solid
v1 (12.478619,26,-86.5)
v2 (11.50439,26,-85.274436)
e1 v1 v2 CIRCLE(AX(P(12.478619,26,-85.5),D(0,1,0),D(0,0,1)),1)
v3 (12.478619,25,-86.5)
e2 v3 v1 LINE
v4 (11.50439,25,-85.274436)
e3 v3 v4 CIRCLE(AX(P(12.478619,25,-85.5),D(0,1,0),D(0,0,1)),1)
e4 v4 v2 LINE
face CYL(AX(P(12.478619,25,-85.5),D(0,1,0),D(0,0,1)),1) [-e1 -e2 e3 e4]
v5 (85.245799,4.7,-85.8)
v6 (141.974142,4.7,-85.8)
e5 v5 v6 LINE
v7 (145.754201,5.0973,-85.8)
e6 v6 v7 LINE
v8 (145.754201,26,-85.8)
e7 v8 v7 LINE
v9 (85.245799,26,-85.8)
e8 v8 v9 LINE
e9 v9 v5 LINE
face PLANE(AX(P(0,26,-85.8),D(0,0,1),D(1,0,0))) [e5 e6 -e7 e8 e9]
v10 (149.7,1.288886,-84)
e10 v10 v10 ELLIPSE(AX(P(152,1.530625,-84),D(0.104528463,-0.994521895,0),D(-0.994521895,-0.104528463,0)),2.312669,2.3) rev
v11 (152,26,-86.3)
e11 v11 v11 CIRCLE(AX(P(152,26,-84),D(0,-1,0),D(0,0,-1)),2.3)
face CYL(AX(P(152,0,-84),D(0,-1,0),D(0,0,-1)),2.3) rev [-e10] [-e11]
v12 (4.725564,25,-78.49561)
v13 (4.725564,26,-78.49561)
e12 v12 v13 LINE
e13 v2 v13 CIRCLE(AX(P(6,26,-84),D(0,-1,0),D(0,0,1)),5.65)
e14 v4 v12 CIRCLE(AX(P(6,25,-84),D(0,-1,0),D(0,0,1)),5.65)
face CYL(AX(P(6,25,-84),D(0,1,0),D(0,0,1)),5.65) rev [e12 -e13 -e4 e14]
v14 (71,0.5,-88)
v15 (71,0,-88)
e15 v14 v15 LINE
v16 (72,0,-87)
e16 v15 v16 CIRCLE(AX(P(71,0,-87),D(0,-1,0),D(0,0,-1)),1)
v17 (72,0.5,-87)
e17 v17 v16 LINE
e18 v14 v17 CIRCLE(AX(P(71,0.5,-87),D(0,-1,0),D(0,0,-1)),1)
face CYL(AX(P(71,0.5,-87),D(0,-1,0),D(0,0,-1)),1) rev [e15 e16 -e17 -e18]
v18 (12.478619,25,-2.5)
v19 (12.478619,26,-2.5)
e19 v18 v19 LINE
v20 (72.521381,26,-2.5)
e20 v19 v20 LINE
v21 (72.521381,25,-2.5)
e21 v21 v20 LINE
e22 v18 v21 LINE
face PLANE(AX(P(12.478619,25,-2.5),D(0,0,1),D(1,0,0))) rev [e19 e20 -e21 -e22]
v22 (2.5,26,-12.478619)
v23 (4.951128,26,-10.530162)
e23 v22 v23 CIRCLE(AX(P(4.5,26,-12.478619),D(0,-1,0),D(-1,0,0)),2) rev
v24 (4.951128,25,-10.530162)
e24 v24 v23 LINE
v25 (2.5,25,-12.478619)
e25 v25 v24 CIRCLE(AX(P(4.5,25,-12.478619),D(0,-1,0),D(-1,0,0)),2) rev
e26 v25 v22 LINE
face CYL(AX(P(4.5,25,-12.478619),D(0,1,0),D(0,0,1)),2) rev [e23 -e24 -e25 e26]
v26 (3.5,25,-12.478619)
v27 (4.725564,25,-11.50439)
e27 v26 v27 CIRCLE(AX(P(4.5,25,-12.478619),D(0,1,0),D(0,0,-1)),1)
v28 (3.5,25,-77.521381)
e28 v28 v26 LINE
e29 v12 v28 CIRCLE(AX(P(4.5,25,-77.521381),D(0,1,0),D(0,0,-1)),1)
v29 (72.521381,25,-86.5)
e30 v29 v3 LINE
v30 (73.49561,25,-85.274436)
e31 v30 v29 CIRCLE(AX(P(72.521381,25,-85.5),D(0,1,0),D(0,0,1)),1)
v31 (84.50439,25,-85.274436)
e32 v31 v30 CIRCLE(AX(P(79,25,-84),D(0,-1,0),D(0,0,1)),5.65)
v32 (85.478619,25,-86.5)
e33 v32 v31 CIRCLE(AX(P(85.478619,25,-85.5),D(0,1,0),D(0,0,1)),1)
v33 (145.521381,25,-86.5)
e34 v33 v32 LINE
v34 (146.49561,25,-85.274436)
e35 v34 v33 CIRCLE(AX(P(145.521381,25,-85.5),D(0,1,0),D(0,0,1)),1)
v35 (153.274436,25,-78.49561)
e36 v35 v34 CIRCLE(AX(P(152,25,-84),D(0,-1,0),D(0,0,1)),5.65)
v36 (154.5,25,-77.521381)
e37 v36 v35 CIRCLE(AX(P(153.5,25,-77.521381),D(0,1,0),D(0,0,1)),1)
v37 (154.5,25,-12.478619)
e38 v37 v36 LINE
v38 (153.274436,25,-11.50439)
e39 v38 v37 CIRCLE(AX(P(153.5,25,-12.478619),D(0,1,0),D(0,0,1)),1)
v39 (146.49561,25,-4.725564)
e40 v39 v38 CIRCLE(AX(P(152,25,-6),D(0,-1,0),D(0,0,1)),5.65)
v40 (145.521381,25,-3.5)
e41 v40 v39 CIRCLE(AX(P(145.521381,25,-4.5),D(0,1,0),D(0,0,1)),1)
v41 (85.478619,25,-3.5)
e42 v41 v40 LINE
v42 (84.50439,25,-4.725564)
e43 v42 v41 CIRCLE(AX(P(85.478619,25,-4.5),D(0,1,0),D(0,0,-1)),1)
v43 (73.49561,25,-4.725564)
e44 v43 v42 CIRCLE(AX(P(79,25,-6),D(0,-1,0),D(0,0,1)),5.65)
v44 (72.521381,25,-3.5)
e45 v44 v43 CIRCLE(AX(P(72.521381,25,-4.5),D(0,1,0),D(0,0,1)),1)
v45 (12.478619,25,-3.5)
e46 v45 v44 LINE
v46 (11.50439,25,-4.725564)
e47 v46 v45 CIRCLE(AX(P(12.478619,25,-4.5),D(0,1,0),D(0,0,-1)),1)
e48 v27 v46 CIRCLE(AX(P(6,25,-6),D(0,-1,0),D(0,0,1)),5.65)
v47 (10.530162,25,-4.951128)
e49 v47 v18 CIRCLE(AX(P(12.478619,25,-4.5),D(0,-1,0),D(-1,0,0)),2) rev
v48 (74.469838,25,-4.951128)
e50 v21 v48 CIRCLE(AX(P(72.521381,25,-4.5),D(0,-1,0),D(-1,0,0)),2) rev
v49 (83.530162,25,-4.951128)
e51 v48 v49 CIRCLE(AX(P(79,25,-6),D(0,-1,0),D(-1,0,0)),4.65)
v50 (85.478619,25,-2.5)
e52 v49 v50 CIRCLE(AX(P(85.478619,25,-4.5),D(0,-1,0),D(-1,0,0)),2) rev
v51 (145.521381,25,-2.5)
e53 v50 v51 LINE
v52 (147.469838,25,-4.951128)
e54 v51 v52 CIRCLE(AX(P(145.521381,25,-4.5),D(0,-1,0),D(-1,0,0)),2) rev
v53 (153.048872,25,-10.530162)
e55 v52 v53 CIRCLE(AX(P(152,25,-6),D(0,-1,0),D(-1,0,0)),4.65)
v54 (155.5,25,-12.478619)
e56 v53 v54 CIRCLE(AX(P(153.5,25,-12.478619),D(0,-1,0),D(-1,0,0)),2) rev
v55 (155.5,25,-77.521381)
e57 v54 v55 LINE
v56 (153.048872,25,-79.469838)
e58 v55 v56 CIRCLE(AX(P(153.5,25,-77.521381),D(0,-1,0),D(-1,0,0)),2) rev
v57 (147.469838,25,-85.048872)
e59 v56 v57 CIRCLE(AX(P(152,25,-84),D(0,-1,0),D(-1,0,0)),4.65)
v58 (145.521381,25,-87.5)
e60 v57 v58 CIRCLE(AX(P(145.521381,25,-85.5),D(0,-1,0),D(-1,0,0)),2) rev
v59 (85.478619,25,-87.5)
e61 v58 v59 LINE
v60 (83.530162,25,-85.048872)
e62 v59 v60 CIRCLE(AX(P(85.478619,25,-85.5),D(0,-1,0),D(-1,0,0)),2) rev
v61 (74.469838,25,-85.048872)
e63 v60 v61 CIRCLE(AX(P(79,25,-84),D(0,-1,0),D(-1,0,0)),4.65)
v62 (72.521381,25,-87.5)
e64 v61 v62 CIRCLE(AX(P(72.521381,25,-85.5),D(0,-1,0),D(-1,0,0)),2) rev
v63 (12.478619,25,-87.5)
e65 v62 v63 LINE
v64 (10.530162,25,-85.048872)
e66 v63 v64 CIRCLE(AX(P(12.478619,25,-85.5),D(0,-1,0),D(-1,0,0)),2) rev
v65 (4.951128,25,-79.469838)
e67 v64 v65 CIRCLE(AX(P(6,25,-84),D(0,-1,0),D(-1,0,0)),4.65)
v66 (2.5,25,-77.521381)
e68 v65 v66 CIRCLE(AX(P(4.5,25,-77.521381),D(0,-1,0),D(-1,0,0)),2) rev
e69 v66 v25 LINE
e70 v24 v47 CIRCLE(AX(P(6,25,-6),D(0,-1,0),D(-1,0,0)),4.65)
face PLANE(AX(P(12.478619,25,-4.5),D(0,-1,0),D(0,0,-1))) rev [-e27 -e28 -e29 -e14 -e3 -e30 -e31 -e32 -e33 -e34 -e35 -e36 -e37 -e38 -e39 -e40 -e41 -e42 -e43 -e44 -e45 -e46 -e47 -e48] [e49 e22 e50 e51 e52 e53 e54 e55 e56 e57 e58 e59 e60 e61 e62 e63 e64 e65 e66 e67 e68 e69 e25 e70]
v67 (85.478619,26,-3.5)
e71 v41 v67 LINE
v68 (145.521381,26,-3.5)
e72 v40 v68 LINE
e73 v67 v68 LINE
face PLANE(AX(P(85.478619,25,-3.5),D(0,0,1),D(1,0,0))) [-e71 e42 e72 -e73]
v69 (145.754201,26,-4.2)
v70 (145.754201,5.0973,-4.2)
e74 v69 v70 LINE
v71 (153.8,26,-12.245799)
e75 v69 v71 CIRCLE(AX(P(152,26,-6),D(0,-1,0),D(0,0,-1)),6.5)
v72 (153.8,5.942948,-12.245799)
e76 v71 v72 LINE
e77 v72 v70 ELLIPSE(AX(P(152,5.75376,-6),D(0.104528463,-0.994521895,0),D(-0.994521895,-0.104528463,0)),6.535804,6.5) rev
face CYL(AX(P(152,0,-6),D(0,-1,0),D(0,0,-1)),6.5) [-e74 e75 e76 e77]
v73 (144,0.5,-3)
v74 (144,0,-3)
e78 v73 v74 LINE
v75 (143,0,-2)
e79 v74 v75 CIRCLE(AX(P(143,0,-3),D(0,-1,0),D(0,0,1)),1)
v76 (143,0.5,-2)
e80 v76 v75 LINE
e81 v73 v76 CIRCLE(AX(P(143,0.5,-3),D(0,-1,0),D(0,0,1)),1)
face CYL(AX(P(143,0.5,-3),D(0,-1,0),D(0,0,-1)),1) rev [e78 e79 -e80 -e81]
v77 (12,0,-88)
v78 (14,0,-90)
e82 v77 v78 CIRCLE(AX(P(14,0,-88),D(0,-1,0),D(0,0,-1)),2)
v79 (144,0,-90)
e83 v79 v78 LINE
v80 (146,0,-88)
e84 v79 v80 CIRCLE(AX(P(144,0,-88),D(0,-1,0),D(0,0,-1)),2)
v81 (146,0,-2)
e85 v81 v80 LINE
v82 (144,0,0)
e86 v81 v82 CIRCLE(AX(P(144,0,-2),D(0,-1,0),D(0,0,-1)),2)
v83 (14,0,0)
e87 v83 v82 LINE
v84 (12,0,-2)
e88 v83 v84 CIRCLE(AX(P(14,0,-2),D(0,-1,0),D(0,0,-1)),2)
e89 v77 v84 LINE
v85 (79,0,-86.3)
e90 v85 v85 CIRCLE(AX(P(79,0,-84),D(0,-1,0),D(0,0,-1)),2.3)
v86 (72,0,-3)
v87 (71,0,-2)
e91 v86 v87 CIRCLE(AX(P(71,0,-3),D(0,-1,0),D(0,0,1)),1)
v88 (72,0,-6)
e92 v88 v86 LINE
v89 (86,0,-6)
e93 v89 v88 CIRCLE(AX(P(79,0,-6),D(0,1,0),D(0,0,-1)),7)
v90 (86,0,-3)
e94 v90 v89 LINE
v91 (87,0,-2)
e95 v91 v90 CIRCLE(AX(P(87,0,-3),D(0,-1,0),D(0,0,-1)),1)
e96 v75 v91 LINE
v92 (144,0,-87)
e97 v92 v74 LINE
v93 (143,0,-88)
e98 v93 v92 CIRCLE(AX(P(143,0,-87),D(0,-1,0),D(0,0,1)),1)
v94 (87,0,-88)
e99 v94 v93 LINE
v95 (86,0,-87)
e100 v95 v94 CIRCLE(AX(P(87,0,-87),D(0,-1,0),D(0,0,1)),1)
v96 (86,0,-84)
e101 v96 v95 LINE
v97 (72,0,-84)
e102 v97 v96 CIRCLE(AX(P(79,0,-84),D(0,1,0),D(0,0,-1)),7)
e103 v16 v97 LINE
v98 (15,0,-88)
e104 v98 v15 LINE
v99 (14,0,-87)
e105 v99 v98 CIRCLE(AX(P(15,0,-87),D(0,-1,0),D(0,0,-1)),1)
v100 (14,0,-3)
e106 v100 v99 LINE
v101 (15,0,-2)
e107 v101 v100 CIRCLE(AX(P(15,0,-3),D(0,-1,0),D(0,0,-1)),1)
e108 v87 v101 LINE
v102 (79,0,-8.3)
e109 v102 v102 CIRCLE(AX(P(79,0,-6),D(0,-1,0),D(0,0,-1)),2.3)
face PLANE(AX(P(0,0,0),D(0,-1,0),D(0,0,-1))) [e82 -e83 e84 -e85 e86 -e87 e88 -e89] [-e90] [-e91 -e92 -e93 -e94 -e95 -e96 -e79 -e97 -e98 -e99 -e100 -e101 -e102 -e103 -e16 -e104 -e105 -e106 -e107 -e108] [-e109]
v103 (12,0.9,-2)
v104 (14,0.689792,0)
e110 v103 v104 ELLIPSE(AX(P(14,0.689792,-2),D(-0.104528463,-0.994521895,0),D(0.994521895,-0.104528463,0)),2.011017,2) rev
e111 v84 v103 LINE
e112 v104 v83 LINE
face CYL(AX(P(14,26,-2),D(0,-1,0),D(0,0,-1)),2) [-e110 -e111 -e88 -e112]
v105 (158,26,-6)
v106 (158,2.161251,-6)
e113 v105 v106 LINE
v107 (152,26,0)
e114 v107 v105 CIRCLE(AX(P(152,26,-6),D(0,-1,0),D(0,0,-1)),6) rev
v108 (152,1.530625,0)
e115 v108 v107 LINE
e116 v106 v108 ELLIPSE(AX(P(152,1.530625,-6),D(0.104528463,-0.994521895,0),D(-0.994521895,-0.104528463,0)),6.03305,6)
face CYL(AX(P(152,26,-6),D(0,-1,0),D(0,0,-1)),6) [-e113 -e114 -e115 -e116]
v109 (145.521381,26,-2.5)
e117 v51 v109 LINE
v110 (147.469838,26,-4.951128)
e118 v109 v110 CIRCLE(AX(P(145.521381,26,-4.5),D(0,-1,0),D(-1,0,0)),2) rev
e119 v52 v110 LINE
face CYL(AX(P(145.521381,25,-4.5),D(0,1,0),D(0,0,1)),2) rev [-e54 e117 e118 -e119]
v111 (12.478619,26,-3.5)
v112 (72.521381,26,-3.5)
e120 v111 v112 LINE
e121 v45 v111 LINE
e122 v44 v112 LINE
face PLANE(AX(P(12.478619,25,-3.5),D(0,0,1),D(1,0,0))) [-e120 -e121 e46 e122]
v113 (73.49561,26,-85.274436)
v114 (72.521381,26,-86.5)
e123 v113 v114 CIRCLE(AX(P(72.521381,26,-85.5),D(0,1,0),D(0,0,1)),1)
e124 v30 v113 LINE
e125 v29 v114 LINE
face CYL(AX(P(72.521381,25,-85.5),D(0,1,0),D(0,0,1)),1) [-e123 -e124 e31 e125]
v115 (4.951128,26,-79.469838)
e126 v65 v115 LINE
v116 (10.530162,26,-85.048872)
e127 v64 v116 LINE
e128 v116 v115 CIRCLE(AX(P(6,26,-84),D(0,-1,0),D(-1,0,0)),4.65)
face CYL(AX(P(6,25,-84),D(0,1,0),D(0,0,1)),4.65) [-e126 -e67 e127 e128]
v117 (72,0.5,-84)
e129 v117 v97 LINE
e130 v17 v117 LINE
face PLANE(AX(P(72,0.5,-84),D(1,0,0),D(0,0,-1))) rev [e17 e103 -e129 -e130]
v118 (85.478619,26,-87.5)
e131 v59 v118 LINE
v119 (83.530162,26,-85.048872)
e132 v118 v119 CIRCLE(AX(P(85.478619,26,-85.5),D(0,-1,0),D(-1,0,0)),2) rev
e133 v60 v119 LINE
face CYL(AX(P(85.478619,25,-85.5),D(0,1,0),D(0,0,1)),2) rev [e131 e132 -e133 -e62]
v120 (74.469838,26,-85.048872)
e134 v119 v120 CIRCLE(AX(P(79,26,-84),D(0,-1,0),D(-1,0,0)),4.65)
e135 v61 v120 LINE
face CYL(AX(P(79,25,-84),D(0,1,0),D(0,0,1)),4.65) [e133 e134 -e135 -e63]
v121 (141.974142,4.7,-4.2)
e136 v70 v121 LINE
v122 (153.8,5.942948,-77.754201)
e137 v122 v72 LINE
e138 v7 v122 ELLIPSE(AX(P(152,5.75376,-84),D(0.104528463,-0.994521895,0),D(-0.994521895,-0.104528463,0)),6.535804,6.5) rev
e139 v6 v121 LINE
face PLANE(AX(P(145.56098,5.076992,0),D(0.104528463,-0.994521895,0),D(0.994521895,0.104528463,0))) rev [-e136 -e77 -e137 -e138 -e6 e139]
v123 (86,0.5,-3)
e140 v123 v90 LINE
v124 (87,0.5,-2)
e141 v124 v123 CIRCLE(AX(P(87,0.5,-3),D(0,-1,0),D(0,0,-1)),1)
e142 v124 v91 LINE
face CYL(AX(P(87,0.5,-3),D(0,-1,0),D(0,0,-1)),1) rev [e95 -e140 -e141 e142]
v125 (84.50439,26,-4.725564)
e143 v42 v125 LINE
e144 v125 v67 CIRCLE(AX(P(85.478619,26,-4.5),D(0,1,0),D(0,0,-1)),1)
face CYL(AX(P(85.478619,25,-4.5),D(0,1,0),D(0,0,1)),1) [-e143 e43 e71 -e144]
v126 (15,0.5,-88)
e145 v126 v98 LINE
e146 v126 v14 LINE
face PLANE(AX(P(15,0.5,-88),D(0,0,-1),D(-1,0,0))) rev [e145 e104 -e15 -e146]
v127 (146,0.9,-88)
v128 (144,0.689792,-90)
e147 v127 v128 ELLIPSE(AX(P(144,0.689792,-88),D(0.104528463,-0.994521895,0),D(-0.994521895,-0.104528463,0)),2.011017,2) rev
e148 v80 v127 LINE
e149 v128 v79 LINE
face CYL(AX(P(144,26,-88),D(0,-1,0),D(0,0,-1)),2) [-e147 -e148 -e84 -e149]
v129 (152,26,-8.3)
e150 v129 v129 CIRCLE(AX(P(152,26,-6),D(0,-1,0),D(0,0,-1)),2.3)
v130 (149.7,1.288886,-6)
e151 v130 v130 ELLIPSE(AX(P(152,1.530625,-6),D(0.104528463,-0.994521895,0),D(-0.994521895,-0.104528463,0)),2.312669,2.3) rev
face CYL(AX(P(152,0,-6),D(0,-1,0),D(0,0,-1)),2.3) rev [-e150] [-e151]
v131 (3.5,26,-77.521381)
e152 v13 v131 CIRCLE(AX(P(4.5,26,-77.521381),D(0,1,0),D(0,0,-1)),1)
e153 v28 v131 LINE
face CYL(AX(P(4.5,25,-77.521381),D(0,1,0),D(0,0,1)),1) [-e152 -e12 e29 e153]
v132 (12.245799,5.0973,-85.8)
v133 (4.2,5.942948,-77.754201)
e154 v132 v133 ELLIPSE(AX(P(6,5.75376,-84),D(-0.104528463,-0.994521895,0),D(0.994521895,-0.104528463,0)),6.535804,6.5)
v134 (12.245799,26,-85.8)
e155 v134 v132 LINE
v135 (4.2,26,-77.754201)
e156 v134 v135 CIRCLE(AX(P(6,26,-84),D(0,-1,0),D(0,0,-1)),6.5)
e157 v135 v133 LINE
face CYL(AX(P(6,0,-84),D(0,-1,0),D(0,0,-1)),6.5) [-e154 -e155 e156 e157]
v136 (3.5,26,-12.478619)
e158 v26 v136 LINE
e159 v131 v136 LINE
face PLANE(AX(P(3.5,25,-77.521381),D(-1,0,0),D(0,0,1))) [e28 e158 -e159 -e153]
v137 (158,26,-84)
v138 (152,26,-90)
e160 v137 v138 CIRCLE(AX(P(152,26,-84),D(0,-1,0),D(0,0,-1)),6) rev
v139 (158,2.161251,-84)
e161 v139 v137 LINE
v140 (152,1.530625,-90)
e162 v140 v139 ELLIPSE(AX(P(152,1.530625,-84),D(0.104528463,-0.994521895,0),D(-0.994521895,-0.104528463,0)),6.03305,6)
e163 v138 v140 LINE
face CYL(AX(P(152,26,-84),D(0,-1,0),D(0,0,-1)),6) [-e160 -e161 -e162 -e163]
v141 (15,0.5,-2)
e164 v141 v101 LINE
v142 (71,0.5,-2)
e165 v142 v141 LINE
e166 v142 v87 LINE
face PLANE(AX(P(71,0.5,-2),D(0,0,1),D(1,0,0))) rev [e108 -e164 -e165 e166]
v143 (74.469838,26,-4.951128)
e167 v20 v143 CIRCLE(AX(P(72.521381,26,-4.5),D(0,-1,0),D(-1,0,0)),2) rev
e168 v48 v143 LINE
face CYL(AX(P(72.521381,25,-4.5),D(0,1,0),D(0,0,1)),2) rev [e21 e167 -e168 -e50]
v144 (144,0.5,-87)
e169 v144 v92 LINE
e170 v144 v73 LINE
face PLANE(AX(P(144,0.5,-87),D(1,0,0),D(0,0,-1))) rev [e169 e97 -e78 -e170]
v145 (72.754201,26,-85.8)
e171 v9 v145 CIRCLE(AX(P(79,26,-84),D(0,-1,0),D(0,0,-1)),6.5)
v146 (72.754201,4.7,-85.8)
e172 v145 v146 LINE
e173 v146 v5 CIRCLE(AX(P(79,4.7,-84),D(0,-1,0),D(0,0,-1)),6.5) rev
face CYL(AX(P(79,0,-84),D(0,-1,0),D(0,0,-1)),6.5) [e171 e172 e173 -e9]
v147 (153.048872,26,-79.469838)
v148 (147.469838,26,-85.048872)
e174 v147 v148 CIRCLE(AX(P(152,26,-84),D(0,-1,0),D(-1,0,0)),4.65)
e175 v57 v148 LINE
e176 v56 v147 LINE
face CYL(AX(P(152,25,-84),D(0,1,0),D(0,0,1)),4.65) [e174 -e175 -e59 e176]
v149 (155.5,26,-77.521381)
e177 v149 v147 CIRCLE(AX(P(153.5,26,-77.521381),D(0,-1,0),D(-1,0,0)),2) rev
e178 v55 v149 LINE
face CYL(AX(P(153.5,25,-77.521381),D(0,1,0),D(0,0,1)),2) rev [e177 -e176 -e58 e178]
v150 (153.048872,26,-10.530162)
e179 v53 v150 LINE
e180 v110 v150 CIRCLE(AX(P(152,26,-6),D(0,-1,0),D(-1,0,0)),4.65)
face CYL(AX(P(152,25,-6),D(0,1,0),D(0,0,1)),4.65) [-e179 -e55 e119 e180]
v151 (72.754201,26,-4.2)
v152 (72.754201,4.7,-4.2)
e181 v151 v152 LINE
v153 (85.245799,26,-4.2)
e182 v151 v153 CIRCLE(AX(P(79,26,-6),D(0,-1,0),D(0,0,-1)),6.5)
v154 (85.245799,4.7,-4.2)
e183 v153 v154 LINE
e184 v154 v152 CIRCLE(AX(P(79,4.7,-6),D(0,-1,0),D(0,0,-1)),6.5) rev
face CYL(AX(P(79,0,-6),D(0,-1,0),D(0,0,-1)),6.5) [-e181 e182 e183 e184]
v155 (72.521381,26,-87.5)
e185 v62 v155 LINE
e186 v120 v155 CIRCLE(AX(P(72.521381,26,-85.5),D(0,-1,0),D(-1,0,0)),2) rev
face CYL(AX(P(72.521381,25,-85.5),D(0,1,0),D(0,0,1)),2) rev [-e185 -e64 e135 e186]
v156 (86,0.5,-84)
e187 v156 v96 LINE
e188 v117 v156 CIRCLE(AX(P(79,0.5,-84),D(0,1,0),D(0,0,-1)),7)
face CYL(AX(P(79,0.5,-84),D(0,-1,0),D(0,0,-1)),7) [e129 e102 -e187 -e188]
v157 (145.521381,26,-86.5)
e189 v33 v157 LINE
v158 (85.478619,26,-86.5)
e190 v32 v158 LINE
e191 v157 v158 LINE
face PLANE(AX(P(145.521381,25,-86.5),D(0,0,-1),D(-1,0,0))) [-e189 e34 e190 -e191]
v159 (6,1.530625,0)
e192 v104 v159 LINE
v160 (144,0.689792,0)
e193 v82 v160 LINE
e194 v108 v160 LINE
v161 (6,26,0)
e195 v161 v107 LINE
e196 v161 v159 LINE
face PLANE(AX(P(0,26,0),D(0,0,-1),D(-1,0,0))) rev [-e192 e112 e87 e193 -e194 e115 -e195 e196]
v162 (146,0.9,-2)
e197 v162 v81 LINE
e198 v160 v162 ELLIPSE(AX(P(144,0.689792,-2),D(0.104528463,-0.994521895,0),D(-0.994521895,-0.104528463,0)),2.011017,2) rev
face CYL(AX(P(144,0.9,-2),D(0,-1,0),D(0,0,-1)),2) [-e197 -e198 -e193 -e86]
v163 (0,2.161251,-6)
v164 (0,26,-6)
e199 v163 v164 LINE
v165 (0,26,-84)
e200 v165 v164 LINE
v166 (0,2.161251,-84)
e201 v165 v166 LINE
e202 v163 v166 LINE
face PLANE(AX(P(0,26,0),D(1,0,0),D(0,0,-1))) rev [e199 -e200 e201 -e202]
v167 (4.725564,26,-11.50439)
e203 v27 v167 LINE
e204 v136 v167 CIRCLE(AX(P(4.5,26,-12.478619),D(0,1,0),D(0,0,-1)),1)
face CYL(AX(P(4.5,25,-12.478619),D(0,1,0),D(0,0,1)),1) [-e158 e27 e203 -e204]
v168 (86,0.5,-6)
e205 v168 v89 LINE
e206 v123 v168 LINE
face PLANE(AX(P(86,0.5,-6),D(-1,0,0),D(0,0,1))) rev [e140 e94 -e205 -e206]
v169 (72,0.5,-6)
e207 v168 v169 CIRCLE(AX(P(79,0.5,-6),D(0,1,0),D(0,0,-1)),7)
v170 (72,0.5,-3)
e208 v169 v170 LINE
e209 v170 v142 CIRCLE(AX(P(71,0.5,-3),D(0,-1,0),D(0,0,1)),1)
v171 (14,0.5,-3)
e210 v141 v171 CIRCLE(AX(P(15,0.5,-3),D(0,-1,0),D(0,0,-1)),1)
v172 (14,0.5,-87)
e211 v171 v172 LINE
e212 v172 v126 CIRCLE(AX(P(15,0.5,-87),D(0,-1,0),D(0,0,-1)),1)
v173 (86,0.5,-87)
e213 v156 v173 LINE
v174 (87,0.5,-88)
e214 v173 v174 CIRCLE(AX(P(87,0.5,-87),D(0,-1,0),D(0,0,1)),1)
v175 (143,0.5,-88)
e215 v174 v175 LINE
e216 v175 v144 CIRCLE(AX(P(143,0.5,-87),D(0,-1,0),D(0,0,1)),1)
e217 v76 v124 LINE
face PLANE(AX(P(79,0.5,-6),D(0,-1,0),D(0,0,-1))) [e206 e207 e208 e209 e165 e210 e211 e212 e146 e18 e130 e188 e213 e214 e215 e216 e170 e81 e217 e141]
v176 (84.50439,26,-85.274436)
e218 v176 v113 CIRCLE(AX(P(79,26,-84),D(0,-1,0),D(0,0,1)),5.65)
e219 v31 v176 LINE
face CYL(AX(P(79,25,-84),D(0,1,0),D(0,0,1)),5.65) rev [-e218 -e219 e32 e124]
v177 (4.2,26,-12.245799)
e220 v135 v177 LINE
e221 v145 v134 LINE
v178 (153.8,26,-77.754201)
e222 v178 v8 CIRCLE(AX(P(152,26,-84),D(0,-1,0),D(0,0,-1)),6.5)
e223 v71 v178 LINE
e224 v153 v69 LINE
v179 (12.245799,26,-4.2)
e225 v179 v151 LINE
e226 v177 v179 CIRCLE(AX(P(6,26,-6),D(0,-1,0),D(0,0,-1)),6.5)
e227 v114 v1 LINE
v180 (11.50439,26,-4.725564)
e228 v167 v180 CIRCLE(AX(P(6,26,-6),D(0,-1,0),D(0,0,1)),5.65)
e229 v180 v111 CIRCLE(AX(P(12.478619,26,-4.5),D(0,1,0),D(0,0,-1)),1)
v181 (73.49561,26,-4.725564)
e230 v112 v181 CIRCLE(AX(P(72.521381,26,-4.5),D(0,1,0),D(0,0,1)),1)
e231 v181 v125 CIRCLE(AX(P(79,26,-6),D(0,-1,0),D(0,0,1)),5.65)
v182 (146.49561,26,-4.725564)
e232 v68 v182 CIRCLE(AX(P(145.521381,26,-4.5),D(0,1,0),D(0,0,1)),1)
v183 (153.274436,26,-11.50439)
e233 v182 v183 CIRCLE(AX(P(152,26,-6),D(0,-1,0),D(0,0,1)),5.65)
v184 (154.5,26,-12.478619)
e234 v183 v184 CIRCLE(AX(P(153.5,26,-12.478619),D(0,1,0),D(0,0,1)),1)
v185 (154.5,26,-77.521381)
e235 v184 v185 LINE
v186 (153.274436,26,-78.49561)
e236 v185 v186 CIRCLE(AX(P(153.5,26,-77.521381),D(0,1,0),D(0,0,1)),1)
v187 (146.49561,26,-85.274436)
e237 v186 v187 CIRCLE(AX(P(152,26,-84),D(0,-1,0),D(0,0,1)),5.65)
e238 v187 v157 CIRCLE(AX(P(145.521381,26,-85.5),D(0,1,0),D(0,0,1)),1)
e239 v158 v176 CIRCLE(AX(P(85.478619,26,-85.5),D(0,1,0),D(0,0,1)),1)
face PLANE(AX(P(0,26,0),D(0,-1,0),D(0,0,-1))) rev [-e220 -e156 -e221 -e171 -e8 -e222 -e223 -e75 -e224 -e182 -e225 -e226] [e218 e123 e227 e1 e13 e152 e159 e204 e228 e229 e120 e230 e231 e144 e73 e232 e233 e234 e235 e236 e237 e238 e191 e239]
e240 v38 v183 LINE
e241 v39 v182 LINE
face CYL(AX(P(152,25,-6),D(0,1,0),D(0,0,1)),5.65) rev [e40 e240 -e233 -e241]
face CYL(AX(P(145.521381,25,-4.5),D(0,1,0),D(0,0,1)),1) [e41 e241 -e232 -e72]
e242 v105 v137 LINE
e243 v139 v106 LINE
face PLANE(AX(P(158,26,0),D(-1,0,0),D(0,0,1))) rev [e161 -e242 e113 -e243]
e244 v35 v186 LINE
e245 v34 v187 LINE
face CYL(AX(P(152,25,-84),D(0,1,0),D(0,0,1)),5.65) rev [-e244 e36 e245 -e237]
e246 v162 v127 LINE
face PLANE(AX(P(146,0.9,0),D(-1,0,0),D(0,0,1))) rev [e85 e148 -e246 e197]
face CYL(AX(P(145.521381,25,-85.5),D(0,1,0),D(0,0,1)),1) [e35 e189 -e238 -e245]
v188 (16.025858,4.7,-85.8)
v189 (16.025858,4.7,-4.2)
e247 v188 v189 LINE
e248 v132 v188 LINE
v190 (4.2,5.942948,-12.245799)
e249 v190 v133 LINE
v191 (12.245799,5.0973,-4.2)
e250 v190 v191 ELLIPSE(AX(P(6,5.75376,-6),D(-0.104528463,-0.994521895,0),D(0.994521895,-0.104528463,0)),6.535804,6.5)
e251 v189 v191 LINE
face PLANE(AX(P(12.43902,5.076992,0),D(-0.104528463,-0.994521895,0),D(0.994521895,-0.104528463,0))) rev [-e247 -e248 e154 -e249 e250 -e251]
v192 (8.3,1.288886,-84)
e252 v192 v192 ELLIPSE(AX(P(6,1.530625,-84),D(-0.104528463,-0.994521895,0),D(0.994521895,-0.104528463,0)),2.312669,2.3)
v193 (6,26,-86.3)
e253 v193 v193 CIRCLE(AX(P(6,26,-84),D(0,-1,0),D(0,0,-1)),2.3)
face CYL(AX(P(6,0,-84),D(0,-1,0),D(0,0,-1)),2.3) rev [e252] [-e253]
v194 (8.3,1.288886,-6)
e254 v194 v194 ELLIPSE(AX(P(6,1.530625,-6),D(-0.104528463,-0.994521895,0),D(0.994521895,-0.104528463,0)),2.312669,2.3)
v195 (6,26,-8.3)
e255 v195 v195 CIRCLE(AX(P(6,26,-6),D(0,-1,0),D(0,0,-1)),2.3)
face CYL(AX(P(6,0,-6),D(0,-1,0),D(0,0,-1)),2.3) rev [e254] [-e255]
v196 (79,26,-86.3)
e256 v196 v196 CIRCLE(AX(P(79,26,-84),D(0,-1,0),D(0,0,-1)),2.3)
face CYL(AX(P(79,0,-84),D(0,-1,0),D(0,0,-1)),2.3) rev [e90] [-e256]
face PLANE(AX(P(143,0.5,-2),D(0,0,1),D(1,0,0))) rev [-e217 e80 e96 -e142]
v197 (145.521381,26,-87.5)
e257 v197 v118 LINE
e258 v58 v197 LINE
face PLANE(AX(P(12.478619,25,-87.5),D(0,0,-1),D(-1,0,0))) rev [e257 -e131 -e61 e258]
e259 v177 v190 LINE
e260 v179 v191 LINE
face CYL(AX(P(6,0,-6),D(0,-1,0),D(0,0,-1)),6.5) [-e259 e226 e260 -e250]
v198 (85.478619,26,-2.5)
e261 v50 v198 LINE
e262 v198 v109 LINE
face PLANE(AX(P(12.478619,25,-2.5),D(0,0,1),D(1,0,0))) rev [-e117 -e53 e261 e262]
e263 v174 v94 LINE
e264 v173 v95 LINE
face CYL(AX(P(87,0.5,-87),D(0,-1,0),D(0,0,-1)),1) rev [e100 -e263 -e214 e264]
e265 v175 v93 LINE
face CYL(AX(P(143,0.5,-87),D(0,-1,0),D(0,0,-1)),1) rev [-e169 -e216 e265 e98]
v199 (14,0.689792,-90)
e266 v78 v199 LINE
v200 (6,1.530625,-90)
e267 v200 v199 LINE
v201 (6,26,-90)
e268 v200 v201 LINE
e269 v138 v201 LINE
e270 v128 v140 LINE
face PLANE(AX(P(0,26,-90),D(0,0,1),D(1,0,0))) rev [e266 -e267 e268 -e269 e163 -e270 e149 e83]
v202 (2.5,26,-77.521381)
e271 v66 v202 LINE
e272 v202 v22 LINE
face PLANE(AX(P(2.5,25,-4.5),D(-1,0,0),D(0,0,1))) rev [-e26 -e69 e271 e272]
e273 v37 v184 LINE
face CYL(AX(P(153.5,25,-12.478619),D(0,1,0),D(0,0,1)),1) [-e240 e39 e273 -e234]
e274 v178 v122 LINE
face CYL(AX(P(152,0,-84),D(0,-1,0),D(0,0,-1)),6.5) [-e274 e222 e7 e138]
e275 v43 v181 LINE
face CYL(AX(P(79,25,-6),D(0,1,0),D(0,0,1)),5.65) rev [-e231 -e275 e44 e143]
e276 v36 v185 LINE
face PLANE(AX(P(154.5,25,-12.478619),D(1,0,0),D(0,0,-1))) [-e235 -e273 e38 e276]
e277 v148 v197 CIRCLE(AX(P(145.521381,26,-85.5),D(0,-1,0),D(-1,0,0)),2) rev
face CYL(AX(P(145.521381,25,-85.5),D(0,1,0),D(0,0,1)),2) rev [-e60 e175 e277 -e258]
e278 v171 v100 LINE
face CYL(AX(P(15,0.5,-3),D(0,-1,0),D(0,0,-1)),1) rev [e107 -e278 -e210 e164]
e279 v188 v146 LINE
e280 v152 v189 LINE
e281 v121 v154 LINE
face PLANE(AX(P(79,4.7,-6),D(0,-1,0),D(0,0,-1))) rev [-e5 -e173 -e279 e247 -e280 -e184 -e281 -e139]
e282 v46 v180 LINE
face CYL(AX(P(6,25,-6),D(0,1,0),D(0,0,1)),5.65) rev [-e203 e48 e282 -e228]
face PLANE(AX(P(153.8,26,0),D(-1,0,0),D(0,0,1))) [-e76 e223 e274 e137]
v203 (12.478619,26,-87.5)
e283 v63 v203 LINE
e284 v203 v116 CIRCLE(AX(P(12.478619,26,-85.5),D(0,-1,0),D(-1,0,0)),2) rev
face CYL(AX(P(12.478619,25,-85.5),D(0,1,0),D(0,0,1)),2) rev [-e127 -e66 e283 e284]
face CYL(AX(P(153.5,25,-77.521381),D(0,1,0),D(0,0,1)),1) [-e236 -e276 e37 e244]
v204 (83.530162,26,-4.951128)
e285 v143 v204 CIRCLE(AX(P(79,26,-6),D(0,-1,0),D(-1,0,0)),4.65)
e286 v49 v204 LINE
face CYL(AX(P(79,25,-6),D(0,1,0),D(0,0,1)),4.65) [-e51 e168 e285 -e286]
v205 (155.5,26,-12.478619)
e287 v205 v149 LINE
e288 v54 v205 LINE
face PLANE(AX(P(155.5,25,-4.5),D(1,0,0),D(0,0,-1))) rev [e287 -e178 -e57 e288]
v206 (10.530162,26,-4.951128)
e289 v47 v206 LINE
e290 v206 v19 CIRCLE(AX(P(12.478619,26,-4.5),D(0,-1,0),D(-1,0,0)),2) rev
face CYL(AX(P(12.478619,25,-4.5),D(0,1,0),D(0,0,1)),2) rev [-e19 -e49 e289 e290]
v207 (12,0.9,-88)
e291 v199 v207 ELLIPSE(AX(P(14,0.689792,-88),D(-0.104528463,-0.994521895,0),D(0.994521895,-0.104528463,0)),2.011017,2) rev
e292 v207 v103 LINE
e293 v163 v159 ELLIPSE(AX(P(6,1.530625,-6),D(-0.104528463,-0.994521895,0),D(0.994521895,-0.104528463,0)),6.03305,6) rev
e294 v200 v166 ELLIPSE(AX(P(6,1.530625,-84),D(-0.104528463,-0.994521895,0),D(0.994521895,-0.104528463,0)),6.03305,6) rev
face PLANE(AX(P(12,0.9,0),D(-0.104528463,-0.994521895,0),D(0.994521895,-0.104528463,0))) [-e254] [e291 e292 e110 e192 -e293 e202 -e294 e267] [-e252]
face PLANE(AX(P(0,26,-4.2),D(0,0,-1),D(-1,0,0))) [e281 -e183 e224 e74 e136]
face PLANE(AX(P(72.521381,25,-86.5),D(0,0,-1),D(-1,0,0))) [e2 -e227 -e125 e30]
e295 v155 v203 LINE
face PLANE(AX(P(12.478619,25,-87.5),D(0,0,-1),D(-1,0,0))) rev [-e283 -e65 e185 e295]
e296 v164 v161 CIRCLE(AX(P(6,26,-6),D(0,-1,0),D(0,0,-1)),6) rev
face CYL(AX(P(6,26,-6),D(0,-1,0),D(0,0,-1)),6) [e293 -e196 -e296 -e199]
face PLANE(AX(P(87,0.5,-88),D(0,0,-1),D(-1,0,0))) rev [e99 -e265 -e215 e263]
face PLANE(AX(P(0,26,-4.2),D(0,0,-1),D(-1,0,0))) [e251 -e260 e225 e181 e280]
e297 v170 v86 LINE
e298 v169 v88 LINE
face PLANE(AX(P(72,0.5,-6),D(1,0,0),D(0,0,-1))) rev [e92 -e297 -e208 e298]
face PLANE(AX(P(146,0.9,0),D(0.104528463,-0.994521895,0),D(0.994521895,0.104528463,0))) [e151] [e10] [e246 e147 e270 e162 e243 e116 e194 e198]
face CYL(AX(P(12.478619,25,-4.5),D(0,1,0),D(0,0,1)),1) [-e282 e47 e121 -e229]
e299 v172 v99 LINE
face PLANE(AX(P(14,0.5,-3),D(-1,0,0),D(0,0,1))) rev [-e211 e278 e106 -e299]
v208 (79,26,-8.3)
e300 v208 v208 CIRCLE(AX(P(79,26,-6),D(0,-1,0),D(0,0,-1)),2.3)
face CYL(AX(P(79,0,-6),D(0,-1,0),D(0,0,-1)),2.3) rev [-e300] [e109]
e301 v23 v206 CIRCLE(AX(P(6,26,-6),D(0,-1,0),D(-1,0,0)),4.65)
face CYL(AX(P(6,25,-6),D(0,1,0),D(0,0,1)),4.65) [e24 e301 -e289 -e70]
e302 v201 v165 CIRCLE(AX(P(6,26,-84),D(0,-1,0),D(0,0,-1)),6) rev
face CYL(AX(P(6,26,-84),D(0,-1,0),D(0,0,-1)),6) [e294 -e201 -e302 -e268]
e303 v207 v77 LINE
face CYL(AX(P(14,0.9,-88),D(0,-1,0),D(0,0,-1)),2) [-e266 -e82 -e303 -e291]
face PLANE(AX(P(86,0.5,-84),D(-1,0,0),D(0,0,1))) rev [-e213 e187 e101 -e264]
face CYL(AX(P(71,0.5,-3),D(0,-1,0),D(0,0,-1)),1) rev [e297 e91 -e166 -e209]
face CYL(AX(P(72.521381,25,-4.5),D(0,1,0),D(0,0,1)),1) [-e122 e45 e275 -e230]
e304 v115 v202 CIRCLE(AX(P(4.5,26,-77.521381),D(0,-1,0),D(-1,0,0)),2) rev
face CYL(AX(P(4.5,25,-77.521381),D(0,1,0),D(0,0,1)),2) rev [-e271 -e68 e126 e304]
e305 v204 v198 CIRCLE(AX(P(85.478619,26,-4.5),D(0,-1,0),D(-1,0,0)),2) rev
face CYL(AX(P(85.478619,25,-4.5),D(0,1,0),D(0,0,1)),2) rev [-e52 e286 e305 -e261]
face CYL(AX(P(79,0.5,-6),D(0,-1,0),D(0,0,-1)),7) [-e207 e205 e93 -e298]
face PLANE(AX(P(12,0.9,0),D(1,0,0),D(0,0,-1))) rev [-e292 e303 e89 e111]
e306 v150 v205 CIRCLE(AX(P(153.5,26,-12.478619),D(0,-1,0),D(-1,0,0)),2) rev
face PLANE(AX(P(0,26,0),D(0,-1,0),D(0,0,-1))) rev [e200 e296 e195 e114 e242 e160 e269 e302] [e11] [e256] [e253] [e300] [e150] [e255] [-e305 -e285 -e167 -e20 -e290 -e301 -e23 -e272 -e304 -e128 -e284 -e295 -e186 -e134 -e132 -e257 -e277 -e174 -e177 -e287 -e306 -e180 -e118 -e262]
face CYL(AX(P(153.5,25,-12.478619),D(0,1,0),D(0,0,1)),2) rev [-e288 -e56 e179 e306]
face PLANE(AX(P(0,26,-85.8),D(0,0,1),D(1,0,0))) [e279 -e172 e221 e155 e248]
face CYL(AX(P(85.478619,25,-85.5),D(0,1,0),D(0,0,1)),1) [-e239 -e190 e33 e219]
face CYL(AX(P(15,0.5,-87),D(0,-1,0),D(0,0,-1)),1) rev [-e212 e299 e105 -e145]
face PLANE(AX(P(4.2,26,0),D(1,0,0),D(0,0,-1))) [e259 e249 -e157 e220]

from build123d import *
from build123d.topology import SkipClean

# Parameters (mm, degrees)
SKETCH1_W               = 158
SKETCH1_H               = 90
BOSS_EXTRUDE1_DEPTH     = 26
FILLET1_R               = 6
SKETCH3_W               = 12
SKETCH3_H               = 90
CUT_EXTRUDE1_DEPTH      = 0.9
FILLET2_R               = 2
DRAFT1_ANGLE            = 6
DRAFT2_ANGLE            = 6
HOLE1_D                 = 4.6
HOLE1_DEPTH             = 26
HOLE1_TIP               = 1.381979424
CUT_EXTRUDE2_DEPTH      = 0.5
SHELL1_START            = -77.5
SHELL1_DEPTH            = 65
SHELL1_START_2          = -85.8
SHELL1_2_DEPTH          = 81.6
SHELL1_START_3          = 4.7
SHELL1_3_DEPTH          = 21.3
CUT_EXTRUDE_THIN1_DEPTH = 1


with BuildPart() as part:
    # Sketch1 → Boss-Extrude1 (new body)
    with BuildSketch(Plane(origin=(0, 0, 0), x_dir=(1, 0, 0), z_dir=(0, 1, 0))):
        with Locations((79, 45)):
            Rectangle(SKETCH1_W, SKETCH1_H)
    extrude(amount=BOSS_EXTRUDE1_DEPTH)

    # Fillet1
    fillet1_edges = [part.edges().sort_by_distance(p)[0] for p in [
        (0, 13, -90),
        (158, 13, -90),
        (158, 13, 0),
        (0, 13, 0),
    ]]
    fillet(fillet1_edges, radius=FILLET1_R)

    # Sketch3 → Cut-Extrude1 (cut)
    with BuildSketch(Plane.XZ):
        with Locations((6, -45)):
            Rectangle(SKETCH3_W, SKETCH3_H)
        with Locations((152, -45)):
            Rectangle(SKETCH3_W, SKETCH3_H)
    extrude(amount=-CUT_EXTRUDE1_DEPTH, mode=Mode.SUBTRACT)

    # Fillet2
    fillet2_edges = [part.edges().sort_by_distance(p)[0] for p in [
        (12, 0.45, -90),
        (12, 0.45, 0),
        (146, 0.45, 0),
        (146, 0.45, -90),
    ]]
    fillet(fillet2_edges, radius=FILLET2_R)

    # Draft1
    draft1_faces = [part.faces().sort_by_distance(p)[0] for p in [
        (151.922094589, 0.9, -45),
    ]]
    draft(draft1_faces, Plane(origin=(146, 0.9, 0), x_dir=(0, 0, 1), z_dir=(1, 0, 0)), DRAFT1_ANGLE)

    # Draft2
    draft2_faces = [part.faces().sort_by_distance(p)[0] for p in [
        (6.077905411, 0.9, -45),
    ]]
    draft(draft2_faces, Plane(origin=(12, 0.9, 0), x_dir=(0, 0, -1), z_dir=(-1, 0, 0)), DRAFT2_ANGLE)

    # Hole1
    with Locations(Plane(origin=(0, 0, 0), x_dir=(-1, 0, 0), z_dir=(0, -1, 0))):
        with Locations((-79, 6), (-79, 84), (-152, 6), (-152, 84), (-6, 84), (-6, 6)):
            Hole(HOLE1_D / 2, depth=HOLE1_DEPTH)
            with Locations((0, 0, -(HOLE1_DEPTH + HOLE1_TIP / 2))):  # 118° drill point
                Cone(0, HOLE1_D / 2, HOLE1_TIP, mode=Mode.SUBTRACT)

    # Sketch6 → Cut-Extrude2 (cut)
    with BuildSketch(Plane.XZ):
        with BuildLine():
            Line((72, -6), (72, -3))
            ThreePointArc((72, -3), (71.707106781, -2.292893219), (71, -2))
            Line((71, -2), (15, -2))
            ThreePointArc((15, -2), (14.292893219, -2.292893219), (14, -3))
            Line((14, -3), (14, -87))
            ThreePointArc((14, -87), (14.292893219, -87.707106781), (15, -88))
            Line((15, -88), (71, -88))
            ThreePointArc((71, -88), (71.707106781, -87.707106781), (72, -87))
            Line((72, -87), (72, -84))
            ThreePointArc((72, -84), (79, -77), (86, -84))
            Line((86, -84), (86, -87))
            ThreePointArc((86, -87), (86.292893219, -87.707106781), (87, -88))
            Line((87, -88), (143, -88))
            ThreePointArc((143, -88), (143.707106781, -87.707106781), (144, -87))
            Line((144, -87), (144, -3))
            ThreePointArc((144, -3), (143.707106781, -2.292893219), (143, -2))
            Line((143, -2), (87, -2))
            ThreePointArc((87, -2), (86.292893219, -2.292893219), (86, -3))
            Line((86, -3), (86, -6))
            ThreePointArc((86, -6), (79, -13), (72, -6))
        make_face()
    extrude(amount=-CUT_EXTRUDE2_DEPTH, mode=Mode.SUBTRACT)

    # Shell1: read off the stored shape, not the designer's step
    # Shell1 outline → Shell1 (cut)
    with BuildSketch(Plane.XY.offset(SHELL1_START)):
        Polygon((4.2, 5.942947809), (16.025858455, 4.7), (141.974141545, 4.7), (153.8, 5.942947809), (153.8, 26), (4.2, 26), align=None)
    extrude(amount=SHELL1_DEPTH, mode=Mode.SUBTRACT)

    # Shell1 2 outline → Shell1 2 (cut)
    with BuildSketch(Plane.XY.offset(SHELL1_START_2)):
        Polygon((4.2, 5.942947809), (16.025858455, 4.7), (141.974141545, 4.7), (153.8, 5.942947809), (153.8, 26), (4.2, 26), align=None)
    extrude(amount=SHELL1_2_DEPTH, mode=Mode.SUBTRACT)

    # Shell1 3 outline → Shell1 3 (add)
    with SkipClean():  # the faces are left unmerged after this step: merging them gives an invalid solid
        with BuildSketch(Plane(origin=(0, 0, 0), x_dir=(1, 0, 0), z_dir=(0, 1, 0)).offset(SHELL1_START_3)):
            with BuildLine():
                ThreePointArc((4.2, 7.431782106), (7.626345597, 7.626345597), (7.431782106, 4.2))
                Line((7.431782106, 4.2), (12.245798588, 4.2))
                ThreePointArc((12.245798588, 4.2), (10.596194078, 10.596194078), (4.2, 12.245798588))
                Line((4.2, 12.245798588), (4.2, 7.431782106))
            make_face()
            with BuildLine():
                ThreePointArc((4.568217894, 4.2), (4.373654403, 4.373654403), (4.2, 4.568217894))
                Line((4.2, 4.568217894), (4.2, 4.2))
                Line((4.2, 4.2), (4.568217894, 4.2))
            make_face()
            with BuildLine():
                Line((4.2, 82.568217894), (4.2, 77.754201412))
                ThreePointArc((4.2, 77.754201412), (10.596194078, 79.403805922), (12.245798588, 85.8))
                Line((12.245798588, 85.8), (7.431782106, 85.8))
                ThreePointArc((7.431782106, 85.8), (7.626345597, 82.373654403), (4.2, 82.568217894))
            make_face()
            with BuildLine():
                ThreePointArc((85.245798588, 4.2), (79, 12.5), (72.754201412, 4.2))
                Line((72.754201412, 4.2), (77.568217894, 4.2))
                ThreePointArc((77.568217894, 4.2), (79, 8.3), (80.431782106, 4.2))
                Line((80.431782106, 4.2), (85.245798588, 4.2))
            make_face()
            with BuildLine():
                Line((77.568217894, 85.8), (72.754201412, 85.8))
                ThreePointArc((72.754201412, 85.8), (79, 77.5), (85.245798588, 85.8))
                Line((85.245798588, 85.8), (80.431782106, 85.8))
                ThreePointArc((80.431782106, 85.8), (79, 81.7), (77.568217894, 85.8))
            make_face()
            with BuildLine():
                Line((4.2, 85.8), (4.2, 85.431782106))
                ThreePointArc((4.2, 85.431782106), (4.373654403, 85.626345597), (4.568217894, 85.8))
                Line((4.568217894, 85.8), (4.2, 85.8))
            make_face()
            with BuildLine():
                ThreePointArc((153.8, 12.245798588), (147.403805922, 10.596194078), (145.754201412, 4.2))
                Line((145.754201412, 4.2), (150.568217894, 4.2))
                ThreePointArc((150.568217894, 4.2), (150.373654403, 7.626345597), (153.8, 7.431782106))
                Line((153.8, 7.431782106), (153.8, 12.245798588))
            make_face()
            with BuildLine():
                Line((150.568217894, 85.8), (145.754201412, 85.8))
                ThreePointArc((145.754201412, 85.8), (147.403805922, 79.403805922), (153.8, 77.754201412))
                Line((153.8, 77.754201412), (153.8, 82.568217894))
                ThreePointArc((153.8, 82.568217894), (150.373654403, 82.373654403), (150.568217894, 85.8))
            make_face()
            with BuildLine():
                ThreePointArc((153.8, 4.568217894), (153.626345597, 4.373654403), (153.431782106, 4.2))
                Line((153.431782106, 4.2), (153.8, 4.2))
                Line((153.8, 4.2), (153.8, 4.568217894))
            make_face()
            with BuildLine():
                Line((153.8, 85.8), (153.431782106, 85.8))
                ThreePointArc((153.431782106, 85.8), (153.626345597, 85.626345597), (153.8, 85.431782106))
                Line((153.8, 85.431782106), (153.8, 85.8))
            make_face()
        extrude(amount=SHELL1_3_DEPTH)

    # Sketch7 → Cut-Extrude-Thin1 (cut)
    with SkipClean():  # the faces are left unmerged after this step: merging them gives an invalid solid
        with BuildSketch(Plane(origin=(0, 26, 0), x_dir=(1, 0, 0), z_dir=(0, 1, 0))):
            with BuildLine():
                ThreePointArc((10.530161934, 85.04887218), (9.288046533, 80.711953467), (4.95112782, 79.469838066))
                ThreePointArc((4.95112782, 79.469838066), (3.255463066, 79.086989132), (2.5, 77.52138132))
                Line((2.5, 77.52138132), (2.5, 12.47861868))
                ThreePointArc((2.5, 12.47861868), (3.255463066, 10.913010868), (4.95112782, 10.530161934))
                ThreePointArc((4.95112782, 10.530161934), (9.288046533, 9.288046533), (10.530161934, 4.95112782))
                ThreePointArc((10.530161934, 4.95112782), (10.913010868, 3.255463066), (12.47861868, 2.5))
                Line((12.47861868, 2.5), (72.52138132, 2.5))
                ThreePointArc((72.52138132, 2.5), (74.086989132, 3.255463066), (74.469838066, 4.95112782))
                ThreePointArc((74.469838066, 4.95112782), (79, 10.65), (83.530161934, 4.95112782))
                ThreePointArc((83.530161934, 4.95112782), (83.913010868, 3.255463066), (85.47861868, 2.5))
                Line((85.47861868, 2.5), (145.52138132, 2.5))
                ThreePointArc((145.52138132, 2.5), (147.086989132, 3.255463066), (147.469838066, 4.95112782))
                ThreePointArc((147.469838066, 4.95112782), (148.711953467, 9.288046533), (153.04887218, 10.530161934))
                ThreePointArc((153.04887218, 10.530161934), (154.744536934, 10.913010868), (155.5, 12.47861868))
                Line((155.5, 12.47861868), (155.5, 77.52138132))
                ThreePointArc((155.5, 77.52138132), (154.744536934, 79.086989132), (153.04887218, 79.469838066))
                ThreePointArc((153.04887218, 79.469838066), (148.711953467, 80.711953467), (147.469838066, 85.04887218))
                ThreePointArc((147.469838066, 85.04887218), (147.086989132, 86.744536934), (145.52138132, 87.5))
                Line((145.52138132, 87.5), (85.47861868, 87.5))
                ThreePointArc((85.47861868, 87.5), (83.913010868, 86.744536934), (83.530161934, 85.04887218))
                ThreePointArc((83.530161934, 85.04887218), (79, 79.35), (74.469838066, 85.04887218))
                ThreePointArc((74.469838066, 85.04887218), (74.086989132, 86.744536934), (72.52138132, 87.5))
                Line((72.52138132, 87.5), (12.47861868, 87.5))
                ThreePointArc((12.47861868, 87.5), (10.913010868, 86.744536934), (10.530161934, 85.04887218))
            make_face()
            with BuildLine():
                ThreePointArc((11.504390307, 85.27443609), (9.995153314, 80.004846686), (4.72556391, 78.495609693))
                ThreePointArc((4.72556391, 78.495609693), (3.877731533, 78.304185226), (3.5, 77.52138132))
                Line((3.5, 77.52138132), (3.5, 12.47861868))
                ThreePointArc((3.5, 12.47861868), (3.877731533, 11.695814774), (4.72556391, 11.504390307))
                ThreePointArc((4.72556391, 11.504390307), (9.995153314, 9.995153314), (11.504390307, 4.72556391))
                ThreePointArc((11.504390307, 4.72556391), (11.695814774, 3.877731533), (12.47861868, 3.5))
                Line((12.47861868, 3.5), (72.52138132, 3.5))
                ThreePointArc((72.52138132, 3.5), (73.304185226, 3.877731533), (73.495609693, 4.72556391))
                ThreePointArc((73.495609693, 4.72556391), (79, 11.65), (84.504390307, 4.72556391))
                ThreePointArc((84.504390307, 4.72556391), (84.695814774, 3.877731533), (85.47861868, 3.5))
                Line((85.47861868, 3.5), (145.52138132, 3.5))
                ThreePointArc((145.52138132, 3.5), (146.304185226, 3.877731533), (146.495609693, 4.72556391))
                ThreePointArc((146.495609693, 4.72556391), (148.004846686, 9.995153314), (153.27443609, 11.504390307))
                ThreePointArc((153.27443609, 11.504390307), (154.122268467, 11.695814774), (154.5, 12.47861868))
                Line((154.5, 12.47861868), (154.5, 77.52138132))
                ThreePointArc((154.5, 77.52138132), (154.122268467, 78.304185226), (153.27443609, 78.495609693))
                ThreePointArc((153.27443609, 78.495609693), (148.004846686, 80.004846686), (146.495609693, 85.27443609))
                ThreePointArc((146.495609693, 85.27443609), (146.304185226, 86.122268467), (145.52138132, 86.5))
                Line((145.52138132, 86.5), (85.47861868, 86.5))
                ThreePointArc((85.47861868, 86.5), (84.695814774, 86.122268467), (84.504390307, 85.27443609))
                ThreePointArc((84.504390307, 85.27443609), (79, 78.35), (73.495609693, 85.27443609))
                ThreePointArc((73.495609693, 85.27443609), (73.304185226, 86.122268467), (72.52138132, 86.5))
                Line((72.52138132, 86.5), (12.47861868, 86.5))
                ThreePointArc((12.47861868, 86.5), (11.695814774, 86.122268467), (11.504390307, 85.27443609))
            make_face(mode=Mode.SUBTRACT)
        extrude(amount=-CUT_EXTRUDE_THIN1_DEPTH, mode=Mode.SUBTRACT)


solid = part.part
